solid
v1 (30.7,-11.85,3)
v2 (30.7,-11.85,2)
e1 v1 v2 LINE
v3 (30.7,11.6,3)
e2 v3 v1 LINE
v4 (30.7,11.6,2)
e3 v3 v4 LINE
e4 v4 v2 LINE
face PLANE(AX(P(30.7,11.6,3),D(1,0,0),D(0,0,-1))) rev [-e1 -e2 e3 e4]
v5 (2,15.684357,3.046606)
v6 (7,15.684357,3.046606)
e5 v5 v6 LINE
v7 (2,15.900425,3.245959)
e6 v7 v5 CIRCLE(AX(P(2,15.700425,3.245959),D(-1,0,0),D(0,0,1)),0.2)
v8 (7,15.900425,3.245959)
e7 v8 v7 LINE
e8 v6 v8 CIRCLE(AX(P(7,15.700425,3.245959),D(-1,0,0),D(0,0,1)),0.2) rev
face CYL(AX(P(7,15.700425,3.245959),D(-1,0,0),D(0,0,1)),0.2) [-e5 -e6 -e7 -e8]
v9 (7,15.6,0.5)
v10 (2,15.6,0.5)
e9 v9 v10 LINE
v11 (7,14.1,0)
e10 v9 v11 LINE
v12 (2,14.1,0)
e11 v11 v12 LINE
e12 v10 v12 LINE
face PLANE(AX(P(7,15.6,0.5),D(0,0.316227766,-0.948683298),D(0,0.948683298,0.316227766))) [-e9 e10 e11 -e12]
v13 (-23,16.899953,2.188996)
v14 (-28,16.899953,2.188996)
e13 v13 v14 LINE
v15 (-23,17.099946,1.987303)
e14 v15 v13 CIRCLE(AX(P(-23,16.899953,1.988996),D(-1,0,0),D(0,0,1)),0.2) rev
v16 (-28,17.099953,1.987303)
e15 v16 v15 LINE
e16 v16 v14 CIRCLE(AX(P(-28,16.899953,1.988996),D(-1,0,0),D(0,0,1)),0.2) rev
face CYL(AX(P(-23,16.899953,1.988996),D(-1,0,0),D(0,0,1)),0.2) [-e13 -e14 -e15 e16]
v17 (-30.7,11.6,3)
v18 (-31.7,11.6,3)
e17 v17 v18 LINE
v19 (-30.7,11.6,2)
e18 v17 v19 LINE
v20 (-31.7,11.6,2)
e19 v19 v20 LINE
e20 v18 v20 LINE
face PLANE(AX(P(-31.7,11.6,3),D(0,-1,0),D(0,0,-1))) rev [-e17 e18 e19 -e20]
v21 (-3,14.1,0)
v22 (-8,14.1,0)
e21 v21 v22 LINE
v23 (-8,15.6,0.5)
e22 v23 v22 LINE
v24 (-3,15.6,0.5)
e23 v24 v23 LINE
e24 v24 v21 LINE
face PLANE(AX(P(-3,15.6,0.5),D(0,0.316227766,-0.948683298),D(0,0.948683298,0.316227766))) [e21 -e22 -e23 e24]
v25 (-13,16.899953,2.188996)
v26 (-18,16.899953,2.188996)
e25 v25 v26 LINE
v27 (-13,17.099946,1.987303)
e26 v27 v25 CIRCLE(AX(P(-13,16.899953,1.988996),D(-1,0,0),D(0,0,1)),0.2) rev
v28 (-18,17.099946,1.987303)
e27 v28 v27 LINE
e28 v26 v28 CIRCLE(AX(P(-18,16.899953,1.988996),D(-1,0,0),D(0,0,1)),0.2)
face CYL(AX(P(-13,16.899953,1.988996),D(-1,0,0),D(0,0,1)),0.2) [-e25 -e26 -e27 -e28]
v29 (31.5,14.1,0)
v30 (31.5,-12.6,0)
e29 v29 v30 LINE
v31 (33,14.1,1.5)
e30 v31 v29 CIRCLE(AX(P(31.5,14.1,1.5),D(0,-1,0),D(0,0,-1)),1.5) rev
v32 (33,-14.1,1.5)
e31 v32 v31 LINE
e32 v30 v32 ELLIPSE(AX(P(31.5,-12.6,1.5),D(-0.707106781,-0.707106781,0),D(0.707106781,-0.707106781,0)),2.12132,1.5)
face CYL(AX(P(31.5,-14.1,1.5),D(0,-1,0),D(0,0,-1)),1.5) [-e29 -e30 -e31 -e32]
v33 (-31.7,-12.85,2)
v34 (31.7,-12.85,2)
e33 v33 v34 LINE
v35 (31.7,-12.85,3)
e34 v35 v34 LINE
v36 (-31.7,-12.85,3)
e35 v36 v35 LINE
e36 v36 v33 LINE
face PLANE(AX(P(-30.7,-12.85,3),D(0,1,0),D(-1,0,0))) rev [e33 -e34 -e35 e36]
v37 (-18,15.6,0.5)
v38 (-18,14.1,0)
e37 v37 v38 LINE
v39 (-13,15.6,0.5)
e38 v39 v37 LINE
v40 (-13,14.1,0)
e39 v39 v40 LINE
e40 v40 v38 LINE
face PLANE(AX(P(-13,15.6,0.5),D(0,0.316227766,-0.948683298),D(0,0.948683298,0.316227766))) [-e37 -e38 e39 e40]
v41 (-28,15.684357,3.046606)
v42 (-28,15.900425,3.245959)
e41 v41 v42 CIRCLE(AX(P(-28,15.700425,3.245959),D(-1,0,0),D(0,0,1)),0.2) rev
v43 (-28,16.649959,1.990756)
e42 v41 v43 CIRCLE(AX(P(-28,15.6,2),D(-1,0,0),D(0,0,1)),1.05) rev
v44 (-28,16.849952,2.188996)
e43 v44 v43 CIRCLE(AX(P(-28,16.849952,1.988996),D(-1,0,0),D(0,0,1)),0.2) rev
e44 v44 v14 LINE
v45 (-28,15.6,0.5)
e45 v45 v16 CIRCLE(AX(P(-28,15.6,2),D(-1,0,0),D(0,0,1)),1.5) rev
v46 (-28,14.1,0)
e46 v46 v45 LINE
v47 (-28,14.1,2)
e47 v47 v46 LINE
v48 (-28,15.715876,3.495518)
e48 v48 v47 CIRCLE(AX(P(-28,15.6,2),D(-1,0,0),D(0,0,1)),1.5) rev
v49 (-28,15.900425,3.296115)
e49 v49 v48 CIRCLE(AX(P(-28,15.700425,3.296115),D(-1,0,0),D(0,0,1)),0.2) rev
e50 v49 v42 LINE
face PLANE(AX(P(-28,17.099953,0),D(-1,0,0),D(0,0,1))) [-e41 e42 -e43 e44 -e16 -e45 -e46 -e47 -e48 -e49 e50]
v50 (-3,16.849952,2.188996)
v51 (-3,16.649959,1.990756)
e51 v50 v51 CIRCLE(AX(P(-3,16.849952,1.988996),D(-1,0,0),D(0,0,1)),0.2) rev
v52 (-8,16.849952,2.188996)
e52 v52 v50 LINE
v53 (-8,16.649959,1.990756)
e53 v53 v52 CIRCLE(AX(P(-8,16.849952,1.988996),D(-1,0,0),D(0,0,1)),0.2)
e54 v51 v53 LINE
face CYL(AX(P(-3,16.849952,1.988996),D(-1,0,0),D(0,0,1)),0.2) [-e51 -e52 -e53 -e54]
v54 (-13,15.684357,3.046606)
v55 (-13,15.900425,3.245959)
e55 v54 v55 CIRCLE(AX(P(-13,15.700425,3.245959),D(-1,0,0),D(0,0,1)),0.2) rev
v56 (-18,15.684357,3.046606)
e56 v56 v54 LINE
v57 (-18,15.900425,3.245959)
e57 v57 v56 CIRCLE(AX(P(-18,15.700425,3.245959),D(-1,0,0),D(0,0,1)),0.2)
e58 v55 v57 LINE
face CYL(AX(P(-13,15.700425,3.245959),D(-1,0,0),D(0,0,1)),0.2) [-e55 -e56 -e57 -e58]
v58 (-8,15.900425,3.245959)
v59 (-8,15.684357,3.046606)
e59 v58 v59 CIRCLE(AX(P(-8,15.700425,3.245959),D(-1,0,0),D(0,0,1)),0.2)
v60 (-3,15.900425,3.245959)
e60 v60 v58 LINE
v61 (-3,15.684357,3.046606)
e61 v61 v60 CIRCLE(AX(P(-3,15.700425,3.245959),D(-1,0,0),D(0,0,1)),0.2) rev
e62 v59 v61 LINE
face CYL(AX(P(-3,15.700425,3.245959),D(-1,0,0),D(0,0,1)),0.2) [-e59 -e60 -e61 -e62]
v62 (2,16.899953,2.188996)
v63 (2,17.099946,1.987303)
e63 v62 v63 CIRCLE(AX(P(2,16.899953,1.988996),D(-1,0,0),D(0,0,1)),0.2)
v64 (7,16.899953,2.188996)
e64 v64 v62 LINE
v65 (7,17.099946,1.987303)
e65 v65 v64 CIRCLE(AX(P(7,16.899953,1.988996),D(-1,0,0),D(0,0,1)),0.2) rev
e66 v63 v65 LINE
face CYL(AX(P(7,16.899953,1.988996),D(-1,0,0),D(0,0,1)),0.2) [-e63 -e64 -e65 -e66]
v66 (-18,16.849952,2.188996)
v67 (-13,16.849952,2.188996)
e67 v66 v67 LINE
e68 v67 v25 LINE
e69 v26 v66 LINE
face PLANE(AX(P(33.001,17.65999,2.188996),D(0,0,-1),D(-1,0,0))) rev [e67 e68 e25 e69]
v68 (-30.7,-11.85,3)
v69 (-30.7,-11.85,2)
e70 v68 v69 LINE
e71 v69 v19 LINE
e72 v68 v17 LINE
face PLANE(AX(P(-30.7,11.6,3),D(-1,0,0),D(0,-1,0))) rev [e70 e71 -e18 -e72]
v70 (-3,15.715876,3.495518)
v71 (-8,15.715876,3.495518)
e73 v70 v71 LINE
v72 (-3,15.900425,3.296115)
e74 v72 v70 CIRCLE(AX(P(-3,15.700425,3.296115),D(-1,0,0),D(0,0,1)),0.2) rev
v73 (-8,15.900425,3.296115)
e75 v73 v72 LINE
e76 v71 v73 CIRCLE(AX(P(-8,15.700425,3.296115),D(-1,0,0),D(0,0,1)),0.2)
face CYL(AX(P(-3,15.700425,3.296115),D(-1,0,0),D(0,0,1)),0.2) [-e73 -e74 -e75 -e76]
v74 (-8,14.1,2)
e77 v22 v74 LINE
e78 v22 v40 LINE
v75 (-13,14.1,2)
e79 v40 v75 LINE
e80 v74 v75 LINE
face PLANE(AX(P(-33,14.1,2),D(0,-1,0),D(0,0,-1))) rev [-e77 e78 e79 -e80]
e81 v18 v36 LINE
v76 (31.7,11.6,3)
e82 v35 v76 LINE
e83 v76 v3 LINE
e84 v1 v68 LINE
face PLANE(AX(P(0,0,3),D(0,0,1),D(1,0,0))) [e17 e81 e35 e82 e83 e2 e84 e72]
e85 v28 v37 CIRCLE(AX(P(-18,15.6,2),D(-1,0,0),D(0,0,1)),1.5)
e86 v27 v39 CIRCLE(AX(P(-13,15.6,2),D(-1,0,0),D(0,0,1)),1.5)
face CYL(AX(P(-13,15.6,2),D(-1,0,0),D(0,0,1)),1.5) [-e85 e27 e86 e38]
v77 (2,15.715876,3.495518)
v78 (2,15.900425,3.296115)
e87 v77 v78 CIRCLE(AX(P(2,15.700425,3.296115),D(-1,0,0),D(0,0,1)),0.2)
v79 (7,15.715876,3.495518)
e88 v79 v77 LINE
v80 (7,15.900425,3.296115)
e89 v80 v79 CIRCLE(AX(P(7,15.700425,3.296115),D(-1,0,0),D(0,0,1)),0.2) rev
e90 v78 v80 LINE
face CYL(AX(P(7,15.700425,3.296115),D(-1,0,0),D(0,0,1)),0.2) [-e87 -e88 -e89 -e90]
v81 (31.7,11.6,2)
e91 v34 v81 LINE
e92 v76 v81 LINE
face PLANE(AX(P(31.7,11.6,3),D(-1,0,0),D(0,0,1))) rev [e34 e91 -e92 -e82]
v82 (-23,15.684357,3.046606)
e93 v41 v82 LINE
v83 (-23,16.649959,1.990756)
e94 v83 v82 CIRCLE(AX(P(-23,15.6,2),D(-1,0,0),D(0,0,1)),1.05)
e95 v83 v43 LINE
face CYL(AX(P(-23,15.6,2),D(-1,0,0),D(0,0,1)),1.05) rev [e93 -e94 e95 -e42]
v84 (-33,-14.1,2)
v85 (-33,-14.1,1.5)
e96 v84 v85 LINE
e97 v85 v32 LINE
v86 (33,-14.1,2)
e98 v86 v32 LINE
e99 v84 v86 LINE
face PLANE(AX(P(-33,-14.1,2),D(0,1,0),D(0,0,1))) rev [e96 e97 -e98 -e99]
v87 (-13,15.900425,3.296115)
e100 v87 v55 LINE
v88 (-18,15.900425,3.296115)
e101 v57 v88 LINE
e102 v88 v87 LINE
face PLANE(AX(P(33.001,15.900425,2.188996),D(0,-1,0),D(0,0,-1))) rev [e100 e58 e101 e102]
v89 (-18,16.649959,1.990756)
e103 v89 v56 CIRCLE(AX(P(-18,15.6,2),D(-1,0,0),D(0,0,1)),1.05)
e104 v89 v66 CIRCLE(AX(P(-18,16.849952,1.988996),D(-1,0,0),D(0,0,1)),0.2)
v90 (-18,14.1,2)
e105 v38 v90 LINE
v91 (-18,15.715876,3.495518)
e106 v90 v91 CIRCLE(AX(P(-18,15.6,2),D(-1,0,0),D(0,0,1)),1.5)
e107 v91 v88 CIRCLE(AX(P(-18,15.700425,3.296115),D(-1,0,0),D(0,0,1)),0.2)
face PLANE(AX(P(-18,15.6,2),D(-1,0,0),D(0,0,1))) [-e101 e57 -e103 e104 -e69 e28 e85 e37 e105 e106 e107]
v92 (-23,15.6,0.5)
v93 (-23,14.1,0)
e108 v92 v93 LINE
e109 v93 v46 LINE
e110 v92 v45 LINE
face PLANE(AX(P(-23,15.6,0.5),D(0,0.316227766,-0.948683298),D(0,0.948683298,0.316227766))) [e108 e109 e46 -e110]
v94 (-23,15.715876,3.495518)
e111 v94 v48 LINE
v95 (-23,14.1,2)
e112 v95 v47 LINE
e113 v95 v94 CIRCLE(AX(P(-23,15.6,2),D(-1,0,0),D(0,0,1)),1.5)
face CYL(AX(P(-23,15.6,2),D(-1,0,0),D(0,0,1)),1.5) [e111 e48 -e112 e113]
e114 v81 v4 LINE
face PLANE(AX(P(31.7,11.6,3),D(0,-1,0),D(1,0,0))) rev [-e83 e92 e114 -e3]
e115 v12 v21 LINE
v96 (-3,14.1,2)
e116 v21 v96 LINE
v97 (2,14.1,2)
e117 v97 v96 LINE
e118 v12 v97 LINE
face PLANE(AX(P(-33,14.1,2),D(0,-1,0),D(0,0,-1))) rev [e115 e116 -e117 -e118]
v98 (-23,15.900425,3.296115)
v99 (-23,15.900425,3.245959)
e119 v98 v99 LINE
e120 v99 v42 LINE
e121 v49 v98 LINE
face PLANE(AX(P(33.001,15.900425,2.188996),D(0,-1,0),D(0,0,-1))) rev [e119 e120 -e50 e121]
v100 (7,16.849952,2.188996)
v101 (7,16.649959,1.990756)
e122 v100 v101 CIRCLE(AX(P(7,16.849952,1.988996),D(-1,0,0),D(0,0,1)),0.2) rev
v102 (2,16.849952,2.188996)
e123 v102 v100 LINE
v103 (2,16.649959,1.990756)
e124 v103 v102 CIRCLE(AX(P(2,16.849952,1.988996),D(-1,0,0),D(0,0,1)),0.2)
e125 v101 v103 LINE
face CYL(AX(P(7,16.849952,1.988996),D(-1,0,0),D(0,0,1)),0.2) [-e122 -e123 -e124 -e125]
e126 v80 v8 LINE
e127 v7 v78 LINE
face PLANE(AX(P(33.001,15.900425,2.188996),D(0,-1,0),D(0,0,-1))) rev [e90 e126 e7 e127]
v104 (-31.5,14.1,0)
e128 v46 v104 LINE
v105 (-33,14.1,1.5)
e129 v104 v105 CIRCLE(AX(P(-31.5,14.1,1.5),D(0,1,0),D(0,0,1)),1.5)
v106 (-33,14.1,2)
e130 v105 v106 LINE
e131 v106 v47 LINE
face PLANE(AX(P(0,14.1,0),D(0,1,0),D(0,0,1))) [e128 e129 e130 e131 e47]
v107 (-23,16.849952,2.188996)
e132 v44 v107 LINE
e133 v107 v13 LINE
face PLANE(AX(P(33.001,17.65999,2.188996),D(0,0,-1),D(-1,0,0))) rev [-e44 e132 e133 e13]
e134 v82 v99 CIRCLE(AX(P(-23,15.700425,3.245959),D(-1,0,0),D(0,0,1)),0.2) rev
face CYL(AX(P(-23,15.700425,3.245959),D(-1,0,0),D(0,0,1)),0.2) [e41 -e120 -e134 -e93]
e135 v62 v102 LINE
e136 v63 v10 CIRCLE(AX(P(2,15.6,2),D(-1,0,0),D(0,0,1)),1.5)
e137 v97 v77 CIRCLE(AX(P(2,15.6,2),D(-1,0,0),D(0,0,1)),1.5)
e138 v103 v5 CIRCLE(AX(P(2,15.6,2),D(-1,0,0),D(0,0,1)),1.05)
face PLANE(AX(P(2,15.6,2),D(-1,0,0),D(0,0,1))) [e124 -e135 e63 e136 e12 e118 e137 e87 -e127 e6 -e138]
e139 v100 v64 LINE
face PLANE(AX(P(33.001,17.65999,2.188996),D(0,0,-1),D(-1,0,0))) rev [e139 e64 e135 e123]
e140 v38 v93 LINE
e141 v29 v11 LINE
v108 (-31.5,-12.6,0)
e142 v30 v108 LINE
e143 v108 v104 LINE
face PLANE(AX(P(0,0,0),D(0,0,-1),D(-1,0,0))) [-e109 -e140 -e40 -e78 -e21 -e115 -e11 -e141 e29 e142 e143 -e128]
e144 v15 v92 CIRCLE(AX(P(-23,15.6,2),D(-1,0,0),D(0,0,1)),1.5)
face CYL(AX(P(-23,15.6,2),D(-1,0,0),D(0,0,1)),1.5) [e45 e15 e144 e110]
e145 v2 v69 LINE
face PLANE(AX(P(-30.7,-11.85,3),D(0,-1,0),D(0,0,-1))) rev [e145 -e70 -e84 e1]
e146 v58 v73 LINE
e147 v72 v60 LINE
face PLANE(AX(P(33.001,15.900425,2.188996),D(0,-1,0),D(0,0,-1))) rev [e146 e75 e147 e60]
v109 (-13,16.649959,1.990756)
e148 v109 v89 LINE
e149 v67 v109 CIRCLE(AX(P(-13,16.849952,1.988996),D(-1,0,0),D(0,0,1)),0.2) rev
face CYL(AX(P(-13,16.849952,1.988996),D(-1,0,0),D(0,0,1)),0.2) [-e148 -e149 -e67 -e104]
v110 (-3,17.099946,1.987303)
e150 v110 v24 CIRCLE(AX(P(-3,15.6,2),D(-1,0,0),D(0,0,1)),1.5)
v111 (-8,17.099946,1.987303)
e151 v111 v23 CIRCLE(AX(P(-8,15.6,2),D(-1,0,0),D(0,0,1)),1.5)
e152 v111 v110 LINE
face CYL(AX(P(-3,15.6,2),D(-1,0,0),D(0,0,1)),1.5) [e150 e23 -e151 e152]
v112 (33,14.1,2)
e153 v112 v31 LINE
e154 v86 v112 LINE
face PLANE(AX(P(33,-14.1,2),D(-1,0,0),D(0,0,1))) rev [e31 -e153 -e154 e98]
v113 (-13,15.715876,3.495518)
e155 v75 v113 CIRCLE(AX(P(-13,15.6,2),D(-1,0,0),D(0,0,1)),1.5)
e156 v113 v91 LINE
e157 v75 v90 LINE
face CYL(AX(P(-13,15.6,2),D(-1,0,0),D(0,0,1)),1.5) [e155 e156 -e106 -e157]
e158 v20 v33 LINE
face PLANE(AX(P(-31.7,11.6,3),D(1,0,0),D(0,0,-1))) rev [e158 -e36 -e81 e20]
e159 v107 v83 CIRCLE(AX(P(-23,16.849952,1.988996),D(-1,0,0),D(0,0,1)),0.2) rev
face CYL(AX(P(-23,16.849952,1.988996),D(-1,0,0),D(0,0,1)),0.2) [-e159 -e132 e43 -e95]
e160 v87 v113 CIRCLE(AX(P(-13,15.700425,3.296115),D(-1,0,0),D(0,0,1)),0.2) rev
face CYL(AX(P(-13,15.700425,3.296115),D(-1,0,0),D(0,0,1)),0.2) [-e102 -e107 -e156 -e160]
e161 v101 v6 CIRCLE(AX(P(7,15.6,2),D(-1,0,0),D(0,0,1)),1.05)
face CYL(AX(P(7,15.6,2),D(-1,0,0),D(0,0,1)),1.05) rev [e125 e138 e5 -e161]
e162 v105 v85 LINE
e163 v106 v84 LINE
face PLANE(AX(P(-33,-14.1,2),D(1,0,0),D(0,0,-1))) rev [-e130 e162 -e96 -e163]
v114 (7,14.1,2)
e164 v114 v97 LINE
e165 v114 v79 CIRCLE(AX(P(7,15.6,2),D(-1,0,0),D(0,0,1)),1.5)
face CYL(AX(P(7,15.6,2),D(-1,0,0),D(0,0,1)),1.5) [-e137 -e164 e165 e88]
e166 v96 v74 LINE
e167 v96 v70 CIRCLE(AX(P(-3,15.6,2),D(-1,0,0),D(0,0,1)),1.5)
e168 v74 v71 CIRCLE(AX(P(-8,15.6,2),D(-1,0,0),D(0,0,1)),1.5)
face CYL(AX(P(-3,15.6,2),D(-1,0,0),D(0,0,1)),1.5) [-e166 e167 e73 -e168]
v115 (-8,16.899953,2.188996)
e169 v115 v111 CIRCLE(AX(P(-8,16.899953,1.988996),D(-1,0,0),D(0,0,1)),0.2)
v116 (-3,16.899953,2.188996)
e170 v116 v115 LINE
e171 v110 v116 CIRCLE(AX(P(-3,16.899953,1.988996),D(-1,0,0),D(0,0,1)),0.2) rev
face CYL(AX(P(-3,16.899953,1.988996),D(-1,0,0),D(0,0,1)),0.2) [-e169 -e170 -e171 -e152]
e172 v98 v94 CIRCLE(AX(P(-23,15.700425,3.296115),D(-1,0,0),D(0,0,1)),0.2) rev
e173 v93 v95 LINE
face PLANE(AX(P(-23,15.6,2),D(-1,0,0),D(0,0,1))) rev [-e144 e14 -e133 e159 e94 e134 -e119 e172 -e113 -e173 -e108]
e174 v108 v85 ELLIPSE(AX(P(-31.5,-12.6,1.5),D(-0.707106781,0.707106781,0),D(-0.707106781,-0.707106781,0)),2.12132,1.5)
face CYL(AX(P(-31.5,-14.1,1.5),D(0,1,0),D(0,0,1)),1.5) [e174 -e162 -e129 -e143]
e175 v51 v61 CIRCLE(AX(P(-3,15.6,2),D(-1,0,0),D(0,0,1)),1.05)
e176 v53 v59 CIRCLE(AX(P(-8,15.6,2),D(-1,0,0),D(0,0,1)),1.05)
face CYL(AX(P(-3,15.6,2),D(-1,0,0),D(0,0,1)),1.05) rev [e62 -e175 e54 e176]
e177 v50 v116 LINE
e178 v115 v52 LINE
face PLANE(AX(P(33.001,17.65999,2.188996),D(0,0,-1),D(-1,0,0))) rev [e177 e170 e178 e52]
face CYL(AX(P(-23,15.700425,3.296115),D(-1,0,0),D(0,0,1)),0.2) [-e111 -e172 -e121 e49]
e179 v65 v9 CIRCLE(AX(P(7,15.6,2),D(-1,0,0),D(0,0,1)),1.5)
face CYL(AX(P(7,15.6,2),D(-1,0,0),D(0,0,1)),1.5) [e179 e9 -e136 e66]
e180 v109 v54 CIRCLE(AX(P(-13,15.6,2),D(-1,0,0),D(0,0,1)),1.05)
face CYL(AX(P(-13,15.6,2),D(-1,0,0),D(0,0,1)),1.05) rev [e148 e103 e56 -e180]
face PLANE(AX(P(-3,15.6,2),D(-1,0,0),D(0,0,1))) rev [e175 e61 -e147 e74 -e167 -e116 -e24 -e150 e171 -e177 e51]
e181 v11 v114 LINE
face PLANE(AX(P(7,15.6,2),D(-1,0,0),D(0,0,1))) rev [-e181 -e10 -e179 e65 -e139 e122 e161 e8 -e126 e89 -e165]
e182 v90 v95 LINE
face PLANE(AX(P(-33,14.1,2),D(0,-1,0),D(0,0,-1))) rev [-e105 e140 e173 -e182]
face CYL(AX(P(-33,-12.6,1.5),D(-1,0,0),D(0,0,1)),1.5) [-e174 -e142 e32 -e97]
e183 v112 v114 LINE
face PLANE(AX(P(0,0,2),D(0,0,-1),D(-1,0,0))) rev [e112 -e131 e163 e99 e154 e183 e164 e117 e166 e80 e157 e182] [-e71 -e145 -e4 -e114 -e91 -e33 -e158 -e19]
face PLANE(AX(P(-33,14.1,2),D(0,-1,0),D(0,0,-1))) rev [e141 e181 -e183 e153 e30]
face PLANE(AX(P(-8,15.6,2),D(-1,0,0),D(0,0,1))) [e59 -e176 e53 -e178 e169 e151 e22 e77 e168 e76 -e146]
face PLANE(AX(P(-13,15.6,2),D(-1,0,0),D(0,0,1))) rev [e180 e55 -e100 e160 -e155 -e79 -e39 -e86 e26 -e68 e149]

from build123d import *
from OCP.BRepAlgoAPI import BRepAlgoAPI_Cut
from OCP.TopTools import TopTools_ListOfShape

# Parameters (mm, degrees)
SKETCH1_W              = 66
SKETCH1_H              = 28.2
BOSS_EXTRUDE1_DEPTH    = 2
SKETCH5_R              = 1.0500000000000005
BOSS_EXTRUDE2_DEPTH    = 5
SKETCH8_W              = 1.7595642605370743
SKETCH8_H              = 1.7595642605370756
CUT_EXTRUDE3_DEPTH     = 5
FILLET4_R              = 0.2
LPATTERN1_COUNT        = 8
LPATTERN1_PITCH        = 5
LPATTERN1_2_COUNT      = 8
LPATTERN1_2_PITCH      = 5
FILLET4_OF_LPATTERN1_R = 0.2
CUT_EXTRUDE1_DEPTH     = 44.54870836201689
FILLET5_R              = 1.5
BOSS_EXTRUDE3_DEPTH    = 1


with BuildPart() as part:
    # Sketch1 → Boss-Extrude1 (new body)
    with BuildSketch(Plane.XY):
        Rectangle(SKETCH1_W, SKETCH1_H)
    extrude(amount=BOSS_EXTRUDE1_DEPTH)


with BuildPart() as body_2:
    # Sketch5 → Boss-Extrude2 (new body)
    with BuildSketch(Plane.ZY.offset(33)):
        with BuildLine():
            Line((0.5, 15.599999999999998), (0, 14.099999999999998))
            Line((0, 14.099999999999998), (2, 14.099999999999998))
            ThreePointArc((2, 14.099999999999998), (3.0606601717798214, 16.66066017177982), (0.5, 15.599999999999998))
        make_face()
        with Locations((2, 15.599999999999998)):
            Circle(SKETCH5_R, mode=Mode.SUBTRACT)
    boss_extrude2 = extrude(amount=-BOSS_EXTRUDE2_DEPTH)

    # Sketch8 → Cut-Extrude3 (cut)
    with BuildSketch(Plane.ZY.offset(33)):
        with Locations((3.068777942853419, 16.780207609912114)):
            Rectangle(SKETCH8_W, SKETCH8_H)
    cut_extrude3 = extrude(amount=-CUT_EXTRUDE3_DEPTH, mode=Mode.SUBTRACT)

    # Fillet4
    fillet4_edges = [body_2.edges().sort_by_distance(p)[0] for p in [
        (-30.5, 16.632850706939475, 2.1889958125848823),
        (-30.5, 15.900425479643578, 3.006103638389667),
        (-30.5, 17.08804589405884, 2.1889958125848823),
        (-30.5, 15.900425479643578, 3.4696069308427098),
    ]]
    fillet(fillet4_edges, radius=FILLET4_R)


with BuildPart() as part_1:
    add(part.part)

    add(body_2.part)  # LPattern1 merges body 2
    # LPattern1: Boss-Extrude2 ×8, 3 skipped
    with Locations(*[(i * LPATTERN1_PITCH, 0, 0) for i in range(1, LPATTERN1_COUNT) if i not in (2, 4, 6)]):
        add(boss_extrude2)

    # LPattern1 2: Cut-Extrude3 ×8, 3 skipped
    with Locations(*[(i * LPATTERN1_2_PITCH, 0, 0) for i in range(1, LPATTERN1_2_COUNT) if i not in (2, 4, 6)]):
        add(cut_extrude3, mode=Mode.SUBTRACT)

    # Fillet4 of LPattern1
    fillet4_of_lpattern1_edges = [part_1.edges().sort_by_distance(p)[0] for p in [
        (-25.5, 16.632850706939475, 2.1889958125848823),
        (-25.5, 15.900425479643578, 3.006103638389667),
        (-25.5, 17.08804589405884, 2.1889958125848823),
        (-25.5, 15.900425479643578, 3.4696069308427098),
        (-15.5, 16.632850706939475, 2.1889958125848823),
        (-15.5, 15.900425479643578, 3.006103638389667),
        (-15.5, 17.08804589405884, 2.1889958125848823),
        (-15.5, 15.900425479643578, 3.4696069308427098),
        (-5.5, 16.632850706939475, 2.1889958125848823),
        (-5.5, 15.900425479643578, 3.006103638389667),
        (-5.5, 17.08804589405884, 2.1889958125848823),
        (-5.5, 15.900425479643578, 3.4696069308427098),
        (4.5, 16.632850706939475, 2.1889958125848823),
        (4.5, 15.900425479643578, 3.006103638389667),
        (4.5, 17.08804589405884, 2.1889958125848823),
        (4.5, 15.900425479643578, 3.4696069308427098),
    ]]
    fillet(fillet4_of_lpattern1_edges, radius=FILLET4_OF_LPATTERN1_R)


with BuildPart() as cut_extrude1_tool:
    # Sketch6 → Cut-Extrude1 (new, through all)
    with BuildSketch(Plane(origin=(0, 14.099999999999998, 0), x_dir=(1, 0, 0), z_dir=(0, 1, 0))):
        Polygon((-33, 0), (-28, 0), (-28, -7.434056861178039), (-33, -7.434056861178038), align=None)
    extrude(amount=CUT_EXTRUDE1_DEPTH)


with BuildPart() as part_2:
    add(part_1.part)

    # Cut-Extrude1: cut by cut_extrude1_tool, with a tolerance
    cut_extrude1_stock = TopTools_ListOfShape()
    cut_extrude1_stock.Append(part_2.part.wrapped)
    cut_extrude1_tools = TopTools_ListOfShape()
    cut_extrude1_tools.Append(cut_extrude1_tool.part.wrapped)
    cut_extrude1_cut = BRepAlgoAPI_Cut()
    cut_extrude1_cut.SetArguments(cut_extrude1_stock)
    cut_extrude1_cut.SetTools(cut_extrude1_tools)
    cut_extrude1_cut.SetFuzzyValue(0.00001)
    cut_extrude1_cut.Build()
    add(Compound.cast(cut_extrude1_cut.Shape()).solids(), mode=Mode.REPLACE)

    # Fillet5
    fillet5_edges = [part_2.edges().sort_by_distance(p)[0] for p in [
        (0, -14.100000000000001, 0),
        (-33, -1.78e-15, 0),
        (33, -1.78e-15, 0),
    ]]
    fillet(fillet5_edges, radius=FILLET5_R)

    # Sketch9 → Boss-Extrude3 (add)
    with BuildSketch(Plane.XY.offset(2)):
        Polygon((-31.7, 11.599999999999998), (-30.7, 11.599999999999998), (-30.699999999999996, -11.85000000000001), (30.7, -11.85000000000001), (30.7, 11.599999999999994), (31.7, 11.599999999999996), (31.7, -11.850000000000012), (31.700000000000006, -12.850000000000001), (-30.7, -12.85000000000001), (-31.7, -12.850000000000009), align=None)
    extrude(amount=BOSS_EXTRUDE3_DEPTH)


solid = part_2.part
